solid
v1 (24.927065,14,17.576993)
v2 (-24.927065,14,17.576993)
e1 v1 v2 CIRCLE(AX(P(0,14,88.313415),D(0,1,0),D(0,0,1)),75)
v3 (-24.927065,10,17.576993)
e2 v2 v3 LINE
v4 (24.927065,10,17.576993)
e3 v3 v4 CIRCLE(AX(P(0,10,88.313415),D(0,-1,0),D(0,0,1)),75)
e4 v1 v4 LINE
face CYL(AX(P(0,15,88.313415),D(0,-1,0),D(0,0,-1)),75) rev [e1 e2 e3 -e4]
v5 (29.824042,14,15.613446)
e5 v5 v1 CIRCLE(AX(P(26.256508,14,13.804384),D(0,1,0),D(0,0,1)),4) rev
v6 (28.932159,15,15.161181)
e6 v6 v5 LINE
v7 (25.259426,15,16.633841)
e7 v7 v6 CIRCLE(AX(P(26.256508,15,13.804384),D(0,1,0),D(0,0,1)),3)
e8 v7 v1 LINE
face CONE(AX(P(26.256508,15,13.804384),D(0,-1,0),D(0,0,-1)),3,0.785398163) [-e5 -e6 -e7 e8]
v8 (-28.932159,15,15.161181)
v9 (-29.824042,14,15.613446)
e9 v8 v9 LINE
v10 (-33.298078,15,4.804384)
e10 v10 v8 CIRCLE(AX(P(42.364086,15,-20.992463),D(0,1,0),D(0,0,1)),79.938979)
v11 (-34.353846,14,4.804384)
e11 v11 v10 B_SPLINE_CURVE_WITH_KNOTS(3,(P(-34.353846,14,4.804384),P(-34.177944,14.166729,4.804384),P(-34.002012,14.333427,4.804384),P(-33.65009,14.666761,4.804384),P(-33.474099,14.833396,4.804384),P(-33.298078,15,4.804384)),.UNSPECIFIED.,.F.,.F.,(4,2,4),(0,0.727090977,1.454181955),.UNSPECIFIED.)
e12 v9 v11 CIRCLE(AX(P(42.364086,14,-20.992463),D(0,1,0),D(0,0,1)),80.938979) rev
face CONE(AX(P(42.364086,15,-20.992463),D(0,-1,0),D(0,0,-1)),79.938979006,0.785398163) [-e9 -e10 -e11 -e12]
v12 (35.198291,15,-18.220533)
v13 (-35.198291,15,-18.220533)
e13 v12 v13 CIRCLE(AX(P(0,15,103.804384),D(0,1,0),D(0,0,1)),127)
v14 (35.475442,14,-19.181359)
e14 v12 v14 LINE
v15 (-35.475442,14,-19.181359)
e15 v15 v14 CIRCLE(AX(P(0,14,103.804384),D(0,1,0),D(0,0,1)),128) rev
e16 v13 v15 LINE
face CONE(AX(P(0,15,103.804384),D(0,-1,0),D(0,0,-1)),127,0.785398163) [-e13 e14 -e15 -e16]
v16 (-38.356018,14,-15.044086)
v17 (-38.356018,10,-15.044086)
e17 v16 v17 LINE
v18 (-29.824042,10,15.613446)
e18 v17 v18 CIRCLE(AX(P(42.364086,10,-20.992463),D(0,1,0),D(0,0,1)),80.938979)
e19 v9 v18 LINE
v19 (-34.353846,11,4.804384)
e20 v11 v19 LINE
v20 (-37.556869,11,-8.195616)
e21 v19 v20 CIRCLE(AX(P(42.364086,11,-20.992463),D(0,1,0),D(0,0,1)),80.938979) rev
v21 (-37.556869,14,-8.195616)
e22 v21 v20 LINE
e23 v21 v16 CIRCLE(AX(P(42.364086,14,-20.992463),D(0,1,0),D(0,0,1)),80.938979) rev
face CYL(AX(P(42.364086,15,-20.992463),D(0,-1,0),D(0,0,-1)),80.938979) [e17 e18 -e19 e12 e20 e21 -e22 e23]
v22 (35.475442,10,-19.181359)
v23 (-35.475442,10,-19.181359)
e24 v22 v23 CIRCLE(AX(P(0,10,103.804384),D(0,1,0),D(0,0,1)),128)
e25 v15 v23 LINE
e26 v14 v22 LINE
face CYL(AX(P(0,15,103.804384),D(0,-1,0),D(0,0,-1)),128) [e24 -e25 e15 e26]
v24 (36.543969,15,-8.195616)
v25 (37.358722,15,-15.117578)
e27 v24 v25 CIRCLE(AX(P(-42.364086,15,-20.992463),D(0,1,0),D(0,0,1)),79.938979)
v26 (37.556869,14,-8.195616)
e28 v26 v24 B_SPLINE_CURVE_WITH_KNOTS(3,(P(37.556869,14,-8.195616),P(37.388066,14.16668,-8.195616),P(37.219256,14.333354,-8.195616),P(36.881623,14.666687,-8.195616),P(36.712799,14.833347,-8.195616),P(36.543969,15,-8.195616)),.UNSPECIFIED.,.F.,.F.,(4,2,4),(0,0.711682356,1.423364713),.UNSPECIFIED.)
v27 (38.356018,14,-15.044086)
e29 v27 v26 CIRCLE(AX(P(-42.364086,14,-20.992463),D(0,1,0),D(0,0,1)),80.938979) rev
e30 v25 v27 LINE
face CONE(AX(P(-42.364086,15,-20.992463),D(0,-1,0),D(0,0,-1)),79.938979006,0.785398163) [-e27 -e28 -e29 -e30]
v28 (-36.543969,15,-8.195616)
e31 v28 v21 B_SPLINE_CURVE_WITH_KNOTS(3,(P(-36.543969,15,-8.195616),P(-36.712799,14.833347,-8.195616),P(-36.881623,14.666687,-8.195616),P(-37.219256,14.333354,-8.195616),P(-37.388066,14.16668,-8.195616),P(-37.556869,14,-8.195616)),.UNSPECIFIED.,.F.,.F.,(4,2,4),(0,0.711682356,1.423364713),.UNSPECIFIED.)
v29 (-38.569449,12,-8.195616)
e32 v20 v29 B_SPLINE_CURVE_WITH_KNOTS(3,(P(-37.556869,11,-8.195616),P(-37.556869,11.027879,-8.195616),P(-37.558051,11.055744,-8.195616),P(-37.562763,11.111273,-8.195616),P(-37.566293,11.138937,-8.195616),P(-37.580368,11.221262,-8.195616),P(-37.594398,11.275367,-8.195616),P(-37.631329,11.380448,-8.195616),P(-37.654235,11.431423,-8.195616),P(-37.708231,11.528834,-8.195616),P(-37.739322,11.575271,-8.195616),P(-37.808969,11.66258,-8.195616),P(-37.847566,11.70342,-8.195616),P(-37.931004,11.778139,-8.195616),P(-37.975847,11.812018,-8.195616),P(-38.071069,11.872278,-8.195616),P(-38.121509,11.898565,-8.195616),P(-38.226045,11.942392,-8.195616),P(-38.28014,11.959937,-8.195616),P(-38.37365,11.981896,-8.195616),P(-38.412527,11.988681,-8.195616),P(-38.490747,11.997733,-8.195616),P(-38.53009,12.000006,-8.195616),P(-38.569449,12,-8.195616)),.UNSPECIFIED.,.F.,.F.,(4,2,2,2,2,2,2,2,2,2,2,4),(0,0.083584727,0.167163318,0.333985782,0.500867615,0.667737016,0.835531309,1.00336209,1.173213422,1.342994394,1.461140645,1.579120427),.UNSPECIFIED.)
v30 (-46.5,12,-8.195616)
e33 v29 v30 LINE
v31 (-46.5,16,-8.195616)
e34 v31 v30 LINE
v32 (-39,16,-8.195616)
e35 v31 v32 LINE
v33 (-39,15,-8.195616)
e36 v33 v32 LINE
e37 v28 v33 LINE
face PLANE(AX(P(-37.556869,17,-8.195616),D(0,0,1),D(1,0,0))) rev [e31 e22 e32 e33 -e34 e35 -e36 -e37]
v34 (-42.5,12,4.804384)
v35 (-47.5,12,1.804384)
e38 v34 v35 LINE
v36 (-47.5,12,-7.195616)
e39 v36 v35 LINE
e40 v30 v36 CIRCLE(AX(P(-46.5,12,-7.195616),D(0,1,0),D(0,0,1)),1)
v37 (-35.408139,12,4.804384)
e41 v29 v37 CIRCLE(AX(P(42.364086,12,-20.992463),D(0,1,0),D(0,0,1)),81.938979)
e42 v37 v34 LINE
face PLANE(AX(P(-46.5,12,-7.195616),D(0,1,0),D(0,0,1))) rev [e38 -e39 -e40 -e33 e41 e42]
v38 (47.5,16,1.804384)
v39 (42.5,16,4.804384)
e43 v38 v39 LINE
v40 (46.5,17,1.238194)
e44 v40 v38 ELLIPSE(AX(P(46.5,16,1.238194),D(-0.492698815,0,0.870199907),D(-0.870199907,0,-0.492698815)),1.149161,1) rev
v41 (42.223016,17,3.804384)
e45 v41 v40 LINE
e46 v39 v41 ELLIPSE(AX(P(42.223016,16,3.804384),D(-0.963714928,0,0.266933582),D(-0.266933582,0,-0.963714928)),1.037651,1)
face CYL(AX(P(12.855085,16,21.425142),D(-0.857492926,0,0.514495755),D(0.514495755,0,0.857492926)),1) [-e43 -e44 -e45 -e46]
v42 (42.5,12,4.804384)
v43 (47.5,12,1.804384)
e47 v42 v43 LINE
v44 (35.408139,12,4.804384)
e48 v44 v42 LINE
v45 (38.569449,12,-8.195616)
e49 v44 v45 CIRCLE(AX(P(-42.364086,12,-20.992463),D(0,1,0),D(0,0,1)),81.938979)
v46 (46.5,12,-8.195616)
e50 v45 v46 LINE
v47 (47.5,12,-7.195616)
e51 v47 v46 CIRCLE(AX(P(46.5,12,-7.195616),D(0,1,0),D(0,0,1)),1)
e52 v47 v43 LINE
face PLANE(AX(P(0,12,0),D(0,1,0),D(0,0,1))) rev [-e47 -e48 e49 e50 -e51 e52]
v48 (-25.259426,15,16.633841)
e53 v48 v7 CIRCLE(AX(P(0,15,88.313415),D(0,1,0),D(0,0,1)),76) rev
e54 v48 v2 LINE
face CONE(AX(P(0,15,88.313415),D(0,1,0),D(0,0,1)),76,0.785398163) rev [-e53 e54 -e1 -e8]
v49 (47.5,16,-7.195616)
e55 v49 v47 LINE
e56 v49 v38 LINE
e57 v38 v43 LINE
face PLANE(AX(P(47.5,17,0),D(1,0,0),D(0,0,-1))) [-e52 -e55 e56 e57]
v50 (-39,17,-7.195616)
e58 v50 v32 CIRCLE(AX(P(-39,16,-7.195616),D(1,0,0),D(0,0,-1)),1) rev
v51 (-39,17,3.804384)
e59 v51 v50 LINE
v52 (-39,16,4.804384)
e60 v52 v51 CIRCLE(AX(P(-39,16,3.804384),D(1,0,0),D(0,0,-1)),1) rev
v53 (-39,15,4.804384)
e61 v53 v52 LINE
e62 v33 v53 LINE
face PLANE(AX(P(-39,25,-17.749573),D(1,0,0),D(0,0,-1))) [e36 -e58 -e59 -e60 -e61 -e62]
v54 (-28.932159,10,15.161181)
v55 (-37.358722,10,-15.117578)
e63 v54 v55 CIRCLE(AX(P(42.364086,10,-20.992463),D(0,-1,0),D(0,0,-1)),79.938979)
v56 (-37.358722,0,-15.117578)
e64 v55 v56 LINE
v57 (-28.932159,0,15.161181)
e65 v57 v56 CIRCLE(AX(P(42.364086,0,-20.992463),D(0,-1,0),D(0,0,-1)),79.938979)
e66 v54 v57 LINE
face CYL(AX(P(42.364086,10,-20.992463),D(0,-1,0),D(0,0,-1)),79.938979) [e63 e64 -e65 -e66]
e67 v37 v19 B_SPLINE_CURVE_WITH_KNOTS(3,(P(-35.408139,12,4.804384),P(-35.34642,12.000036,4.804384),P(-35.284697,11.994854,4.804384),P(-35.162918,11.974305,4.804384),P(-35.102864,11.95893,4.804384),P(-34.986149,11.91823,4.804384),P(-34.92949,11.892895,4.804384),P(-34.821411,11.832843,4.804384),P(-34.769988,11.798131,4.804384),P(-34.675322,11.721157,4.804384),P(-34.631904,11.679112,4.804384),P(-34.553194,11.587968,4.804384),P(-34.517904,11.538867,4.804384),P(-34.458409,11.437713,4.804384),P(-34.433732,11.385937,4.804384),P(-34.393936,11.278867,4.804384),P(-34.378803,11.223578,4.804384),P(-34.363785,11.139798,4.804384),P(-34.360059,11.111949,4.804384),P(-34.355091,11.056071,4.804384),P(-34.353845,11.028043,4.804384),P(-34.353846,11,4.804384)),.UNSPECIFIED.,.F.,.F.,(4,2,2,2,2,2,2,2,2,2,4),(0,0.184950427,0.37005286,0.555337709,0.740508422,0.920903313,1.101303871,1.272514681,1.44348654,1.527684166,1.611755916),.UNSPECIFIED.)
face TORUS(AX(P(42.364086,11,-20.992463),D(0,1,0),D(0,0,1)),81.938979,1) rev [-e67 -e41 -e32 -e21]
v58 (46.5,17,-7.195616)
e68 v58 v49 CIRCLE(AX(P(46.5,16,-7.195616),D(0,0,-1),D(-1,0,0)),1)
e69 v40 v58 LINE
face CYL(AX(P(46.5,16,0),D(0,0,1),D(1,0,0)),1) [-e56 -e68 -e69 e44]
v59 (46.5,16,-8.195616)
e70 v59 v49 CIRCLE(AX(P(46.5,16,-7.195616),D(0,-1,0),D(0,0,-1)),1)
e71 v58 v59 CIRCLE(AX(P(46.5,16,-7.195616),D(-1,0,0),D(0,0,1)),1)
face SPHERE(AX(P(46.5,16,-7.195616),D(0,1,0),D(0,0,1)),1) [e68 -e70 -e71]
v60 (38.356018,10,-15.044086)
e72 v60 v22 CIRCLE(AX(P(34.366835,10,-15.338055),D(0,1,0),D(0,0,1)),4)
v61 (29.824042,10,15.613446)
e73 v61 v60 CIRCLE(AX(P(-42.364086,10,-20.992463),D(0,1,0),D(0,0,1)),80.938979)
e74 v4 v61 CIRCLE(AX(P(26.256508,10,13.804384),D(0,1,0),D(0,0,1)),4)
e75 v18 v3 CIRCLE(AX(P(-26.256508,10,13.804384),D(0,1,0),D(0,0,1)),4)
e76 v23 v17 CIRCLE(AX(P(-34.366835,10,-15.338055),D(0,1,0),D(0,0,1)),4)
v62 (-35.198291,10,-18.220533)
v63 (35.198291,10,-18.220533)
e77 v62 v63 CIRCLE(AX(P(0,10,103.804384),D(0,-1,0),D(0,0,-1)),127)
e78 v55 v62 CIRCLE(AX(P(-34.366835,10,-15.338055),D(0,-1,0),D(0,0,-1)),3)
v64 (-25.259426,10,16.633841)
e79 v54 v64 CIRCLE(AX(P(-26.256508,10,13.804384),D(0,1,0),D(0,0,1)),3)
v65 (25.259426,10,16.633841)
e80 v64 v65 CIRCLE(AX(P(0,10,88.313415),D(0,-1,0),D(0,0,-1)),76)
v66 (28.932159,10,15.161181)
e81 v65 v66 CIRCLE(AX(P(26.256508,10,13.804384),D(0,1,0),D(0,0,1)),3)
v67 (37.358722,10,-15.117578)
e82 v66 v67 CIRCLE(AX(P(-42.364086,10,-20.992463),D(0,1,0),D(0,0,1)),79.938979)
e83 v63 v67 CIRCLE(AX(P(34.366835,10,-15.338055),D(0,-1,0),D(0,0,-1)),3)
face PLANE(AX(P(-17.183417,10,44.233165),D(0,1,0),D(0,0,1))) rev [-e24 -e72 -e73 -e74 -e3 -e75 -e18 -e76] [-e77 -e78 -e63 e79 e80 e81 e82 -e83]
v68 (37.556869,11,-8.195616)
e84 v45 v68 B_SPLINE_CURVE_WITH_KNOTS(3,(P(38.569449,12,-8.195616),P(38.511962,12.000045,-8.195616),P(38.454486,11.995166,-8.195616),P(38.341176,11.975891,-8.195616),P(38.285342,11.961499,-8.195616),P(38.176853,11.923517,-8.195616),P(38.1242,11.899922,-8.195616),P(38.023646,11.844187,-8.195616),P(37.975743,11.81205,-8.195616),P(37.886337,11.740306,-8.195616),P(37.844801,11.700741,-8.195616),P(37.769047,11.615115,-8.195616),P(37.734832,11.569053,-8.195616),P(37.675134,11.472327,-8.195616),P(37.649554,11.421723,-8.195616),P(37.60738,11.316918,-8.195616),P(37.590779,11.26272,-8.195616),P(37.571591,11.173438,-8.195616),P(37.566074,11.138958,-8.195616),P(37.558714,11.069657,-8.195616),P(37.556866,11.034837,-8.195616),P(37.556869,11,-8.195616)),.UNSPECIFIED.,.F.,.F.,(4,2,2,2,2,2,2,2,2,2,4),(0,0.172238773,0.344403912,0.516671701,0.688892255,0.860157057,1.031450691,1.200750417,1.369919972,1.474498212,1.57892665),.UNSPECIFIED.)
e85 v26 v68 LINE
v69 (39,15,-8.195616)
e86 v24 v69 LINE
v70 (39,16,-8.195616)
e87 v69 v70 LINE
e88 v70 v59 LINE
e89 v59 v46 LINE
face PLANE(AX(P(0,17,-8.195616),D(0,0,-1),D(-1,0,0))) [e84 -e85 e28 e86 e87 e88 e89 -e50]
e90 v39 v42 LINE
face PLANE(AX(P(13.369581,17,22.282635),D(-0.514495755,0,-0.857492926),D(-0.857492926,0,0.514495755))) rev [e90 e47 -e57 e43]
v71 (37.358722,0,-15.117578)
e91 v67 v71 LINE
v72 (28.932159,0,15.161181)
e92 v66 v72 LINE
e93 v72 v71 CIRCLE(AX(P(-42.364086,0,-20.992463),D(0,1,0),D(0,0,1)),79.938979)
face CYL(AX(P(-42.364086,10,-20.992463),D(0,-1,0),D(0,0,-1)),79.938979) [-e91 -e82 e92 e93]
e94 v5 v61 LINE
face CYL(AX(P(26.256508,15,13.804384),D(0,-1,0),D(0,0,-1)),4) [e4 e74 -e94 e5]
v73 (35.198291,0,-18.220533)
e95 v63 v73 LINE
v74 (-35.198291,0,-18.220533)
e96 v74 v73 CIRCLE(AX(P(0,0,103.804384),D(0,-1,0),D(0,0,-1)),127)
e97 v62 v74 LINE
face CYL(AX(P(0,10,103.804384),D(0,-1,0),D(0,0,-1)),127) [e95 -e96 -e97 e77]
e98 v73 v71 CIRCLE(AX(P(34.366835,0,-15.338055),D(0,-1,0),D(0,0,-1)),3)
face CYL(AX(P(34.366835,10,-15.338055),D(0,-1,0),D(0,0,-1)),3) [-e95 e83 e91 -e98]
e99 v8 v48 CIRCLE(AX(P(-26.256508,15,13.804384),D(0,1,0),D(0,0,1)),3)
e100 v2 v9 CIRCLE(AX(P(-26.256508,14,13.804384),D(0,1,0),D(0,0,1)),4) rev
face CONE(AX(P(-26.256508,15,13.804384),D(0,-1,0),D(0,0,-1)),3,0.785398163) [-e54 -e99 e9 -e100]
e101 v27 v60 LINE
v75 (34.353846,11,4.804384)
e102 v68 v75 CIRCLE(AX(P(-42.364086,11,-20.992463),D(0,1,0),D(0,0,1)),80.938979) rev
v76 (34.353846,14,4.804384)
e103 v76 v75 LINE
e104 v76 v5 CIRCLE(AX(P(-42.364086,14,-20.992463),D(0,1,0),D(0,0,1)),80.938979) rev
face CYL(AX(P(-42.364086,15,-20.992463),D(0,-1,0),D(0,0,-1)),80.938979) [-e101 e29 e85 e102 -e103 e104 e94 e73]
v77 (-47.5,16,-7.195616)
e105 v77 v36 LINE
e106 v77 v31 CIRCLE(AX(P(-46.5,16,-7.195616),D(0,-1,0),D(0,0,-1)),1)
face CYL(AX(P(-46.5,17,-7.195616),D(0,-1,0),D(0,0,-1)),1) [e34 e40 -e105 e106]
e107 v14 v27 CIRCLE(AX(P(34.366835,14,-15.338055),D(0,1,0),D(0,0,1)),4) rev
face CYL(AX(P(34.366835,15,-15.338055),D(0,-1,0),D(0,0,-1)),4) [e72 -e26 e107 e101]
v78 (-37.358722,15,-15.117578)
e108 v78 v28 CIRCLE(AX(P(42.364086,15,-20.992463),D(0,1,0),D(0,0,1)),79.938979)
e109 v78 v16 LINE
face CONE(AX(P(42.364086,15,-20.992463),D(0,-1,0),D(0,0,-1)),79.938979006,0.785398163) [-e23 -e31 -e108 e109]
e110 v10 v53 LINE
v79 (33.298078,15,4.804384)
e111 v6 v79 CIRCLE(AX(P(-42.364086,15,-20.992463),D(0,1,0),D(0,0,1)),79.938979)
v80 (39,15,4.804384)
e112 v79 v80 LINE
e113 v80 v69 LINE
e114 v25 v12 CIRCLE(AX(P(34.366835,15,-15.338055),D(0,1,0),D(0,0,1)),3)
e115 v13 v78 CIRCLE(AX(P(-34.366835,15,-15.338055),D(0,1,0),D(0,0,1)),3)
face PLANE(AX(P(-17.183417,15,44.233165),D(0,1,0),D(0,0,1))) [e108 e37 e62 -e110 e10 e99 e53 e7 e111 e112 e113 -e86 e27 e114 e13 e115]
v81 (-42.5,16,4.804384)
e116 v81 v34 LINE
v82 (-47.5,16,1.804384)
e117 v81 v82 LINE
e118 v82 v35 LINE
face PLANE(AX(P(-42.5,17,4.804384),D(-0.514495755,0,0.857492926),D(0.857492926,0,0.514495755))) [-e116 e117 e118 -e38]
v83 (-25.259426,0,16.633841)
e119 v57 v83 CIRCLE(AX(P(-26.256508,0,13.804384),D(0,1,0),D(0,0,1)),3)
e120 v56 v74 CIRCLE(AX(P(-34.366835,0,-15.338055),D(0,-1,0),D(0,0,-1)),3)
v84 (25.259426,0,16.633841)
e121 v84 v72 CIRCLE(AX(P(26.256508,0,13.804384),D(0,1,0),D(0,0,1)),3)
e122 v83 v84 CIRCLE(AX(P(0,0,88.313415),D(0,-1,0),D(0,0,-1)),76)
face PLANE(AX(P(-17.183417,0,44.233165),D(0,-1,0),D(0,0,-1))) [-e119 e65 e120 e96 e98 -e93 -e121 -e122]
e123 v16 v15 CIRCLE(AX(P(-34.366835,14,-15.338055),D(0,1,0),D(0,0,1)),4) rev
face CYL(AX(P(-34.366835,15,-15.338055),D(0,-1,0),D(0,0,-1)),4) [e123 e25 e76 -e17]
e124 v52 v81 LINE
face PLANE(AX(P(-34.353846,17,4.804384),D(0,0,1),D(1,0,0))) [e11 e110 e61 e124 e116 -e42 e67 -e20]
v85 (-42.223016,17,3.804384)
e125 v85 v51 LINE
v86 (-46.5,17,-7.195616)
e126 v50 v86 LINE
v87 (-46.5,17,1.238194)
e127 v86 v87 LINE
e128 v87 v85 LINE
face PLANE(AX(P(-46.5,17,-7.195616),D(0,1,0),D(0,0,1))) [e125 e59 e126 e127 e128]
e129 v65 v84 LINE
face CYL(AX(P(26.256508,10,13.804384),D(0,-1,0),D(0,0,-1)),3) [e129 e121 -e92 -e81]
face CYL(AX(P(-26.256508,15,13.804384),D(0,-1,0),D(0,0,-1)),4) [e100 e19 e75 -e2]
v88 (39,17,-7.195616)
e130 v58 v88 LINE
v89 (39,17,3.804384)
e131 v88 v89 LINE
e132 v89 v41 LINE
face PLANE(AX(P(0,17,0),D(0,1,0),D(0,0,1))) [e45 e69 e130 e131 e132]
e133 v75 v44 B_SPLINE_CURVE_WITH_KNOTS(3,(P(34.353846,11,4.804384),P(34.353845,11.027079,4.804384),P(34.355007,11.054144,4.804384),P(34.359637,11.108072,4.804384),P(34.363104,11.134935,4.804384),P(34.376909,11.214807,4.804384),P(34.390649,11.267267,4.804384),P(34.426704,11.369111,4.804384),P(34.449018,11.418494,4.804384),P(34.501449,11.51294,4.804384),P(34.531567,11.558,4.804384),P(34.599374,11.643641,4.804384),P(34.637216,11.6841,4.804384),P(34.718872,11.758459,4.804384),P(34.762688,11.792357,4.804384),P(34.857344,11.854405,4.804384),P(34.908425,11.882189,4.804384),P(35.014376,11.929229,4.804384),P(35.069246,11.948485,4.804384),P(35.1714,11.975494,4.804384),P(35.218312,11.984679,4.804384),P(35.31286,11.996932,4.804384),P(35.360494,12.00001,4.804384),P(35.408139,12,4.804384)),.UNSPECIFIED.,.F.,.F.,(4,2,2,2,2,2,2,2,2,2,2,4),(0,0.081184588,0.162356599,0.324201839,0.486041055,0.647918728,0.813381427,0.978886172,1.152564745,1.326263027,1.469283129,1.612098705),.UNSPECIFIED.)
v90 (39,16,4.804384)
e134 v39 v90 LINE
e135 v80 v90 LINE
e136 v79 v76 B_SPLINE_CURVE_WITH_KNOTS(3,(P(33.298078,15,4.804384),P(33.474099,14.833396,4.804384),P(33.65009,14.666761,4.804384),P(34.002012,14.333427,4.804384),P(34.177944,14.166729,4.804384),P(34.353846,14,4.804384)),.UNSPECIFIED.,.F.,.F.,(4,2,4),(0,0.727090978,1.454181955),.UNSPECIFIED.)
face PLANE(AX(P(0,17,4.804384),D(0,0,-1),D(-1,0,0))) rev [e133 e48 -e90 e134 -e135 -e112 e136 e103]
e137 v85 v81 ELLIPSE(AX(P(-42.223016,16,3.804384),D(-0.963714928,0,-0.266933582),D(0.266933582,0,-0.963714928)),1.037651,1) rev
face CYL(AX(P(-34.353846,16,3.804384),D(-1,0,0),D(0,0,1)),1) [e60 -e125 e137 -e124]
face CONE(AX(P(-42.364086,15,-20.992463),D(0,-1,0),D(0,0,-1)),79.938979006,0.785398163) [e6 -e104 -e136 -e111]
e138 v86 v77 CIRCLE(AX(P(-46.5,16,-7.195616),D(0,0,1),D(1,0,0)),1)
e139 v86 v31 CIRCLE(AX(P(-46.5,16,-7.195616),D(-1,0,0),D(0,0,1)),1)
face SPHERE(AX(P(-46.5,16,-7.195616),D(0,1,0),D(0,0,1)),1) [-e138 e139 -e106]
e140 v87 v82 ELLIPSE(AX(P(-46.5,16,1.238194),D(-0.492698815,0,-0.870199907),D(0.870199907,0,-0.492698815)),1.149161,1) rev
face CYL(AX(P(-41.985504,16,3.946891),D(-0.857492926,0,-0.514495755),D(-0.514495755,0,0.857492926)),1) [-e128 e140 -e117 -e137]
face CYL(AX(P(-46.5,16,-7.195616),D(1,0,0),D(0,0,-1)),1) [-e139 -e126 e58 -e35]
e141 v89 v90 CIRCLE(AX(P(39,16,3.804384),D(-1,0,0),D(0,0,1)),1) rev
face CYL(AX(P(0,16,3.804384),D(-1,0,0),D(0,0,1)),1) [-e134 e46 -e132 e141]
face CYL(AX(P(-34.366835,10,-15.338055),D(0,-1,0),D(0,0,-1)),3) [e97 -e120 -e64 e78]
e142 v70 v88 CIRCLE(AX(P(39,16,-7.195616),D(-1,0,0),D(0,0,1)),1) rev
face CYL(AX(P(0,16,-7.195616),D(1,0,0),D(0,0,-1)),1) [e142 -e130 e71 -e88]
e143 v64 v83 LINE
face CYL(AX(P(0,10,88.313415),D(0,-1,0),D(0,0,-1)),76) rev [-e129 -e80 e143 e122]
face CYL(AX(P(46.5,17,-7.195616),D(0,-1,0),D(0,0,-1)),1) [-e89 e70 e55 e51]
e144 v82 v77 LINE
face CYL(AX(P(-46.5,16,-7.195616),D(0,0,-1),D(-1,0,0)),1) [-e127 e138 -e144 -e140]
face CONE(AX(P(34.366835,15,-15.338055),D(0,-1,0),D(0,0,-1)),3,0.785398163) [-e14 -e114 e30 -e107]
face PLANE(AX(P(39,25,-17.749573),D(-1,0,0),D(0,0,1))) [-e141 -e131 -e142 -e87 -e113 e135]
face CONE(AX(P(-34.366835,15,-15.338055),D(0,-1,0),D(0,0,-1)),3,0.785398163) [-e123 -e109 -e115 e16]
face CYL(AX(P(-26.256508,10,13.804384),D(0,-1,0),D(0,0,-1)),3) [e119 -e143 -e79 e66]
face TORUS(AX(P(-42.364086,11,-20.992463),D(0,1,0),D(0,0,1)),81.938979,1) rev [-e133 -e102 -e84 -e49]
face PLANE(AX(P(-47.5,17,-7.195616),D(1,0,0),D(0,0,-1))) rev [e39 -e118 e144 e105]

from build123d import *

# Parameters (mm, degrees)
DODANIE_WYCI_GNI_CIE2_DEPTH      = 10
DODANIE_WYCI_GNI_CIE3_DEPTH      = 5
DODANIE_WYCI_GNI_CIE4_DEPTH      = 2
DODANIE_WYCI_GNI_CIE4_DEPTH_BACK = 3
SFAZOWANIE2_SIZE                 = 1
ZAOKR_GLENIE2_R                  = 1
SZKIC5_W                         = 78
SZKIC5_H                         = 47.399243566
WYTNIJ_WYCI_GNI_CIE1_DEPTH       = 10


with BuildPart() as part:
    # Szkic1 → Dodanie-wyciągnięcie2 (new body)
    with BuildSketch(Plane(origin=(0, 0, 0), x_dir=(1, 0, 0), z_dir=(0, 1, 0))):
        with BuildLine():
            ThreePointArc((-35.198290521, 18.220532858), (0, 23.195615958), (35.198290521, 18.220532858))
            ThreePointArc((35.198290521, 18.220532858), (36.828860435, 17.052239434), (37.358722234, 15.117578161))
            ThreePointArc((37.358722234, 15.117578161), (34.64818175, -0.440013395), (28.93215854, -15.161180582))
            ThreePointArc((28.93215854, -15.161180582), (27.37301165, -16.588880533), (25.259425897, -16.633840931))
            ThreePointArc((25.259425897, -16.633840931), (0, -12.31341545), (-25.259425897, -16.633840931))
            ThreePointArc((-25.259425897, -16.633840931), (-27.37301165, -16.588880533), (-28.93215854, -15.161180582))
            ThreePointArc((-28.93215854, -15.161180582), (-34.64818175, -0.440013395), (-37.358722234, 15.117578161))
            ThreePointArc((-37.358722234, 15.117578161), (-36.828860435, 17.052239434), (-35.198290521, 18.220532858))
        make_face()
    extrude(amount=DODANIE_WYCI_GNI_CIE2_DEPTH)

    # Szkic3 → Dodanie-wyciągnięcie3 (add)
    with BuildSketch(Plane(origin=(0, 10, 0), x_dir=(1, 0, 0), z_dir=(0, 1, 0))):
        with BuildLine():
            ThreePointArc((-35.475442415, 19.181358975), (-37.649535634, 17.62363441), (-38.356018032, 15.044086045))
            ThreePointArc((-38.356018032, 15.044086045), (-35.611569929, -0.708123852), (-29.824041887, -15.613446096))
            ThreePointArc((-29.824041887, -15.613446096), (-27.745179368, -17.51704603), (-24.92706503, -17.576993227))
            ThreePointArc((-24.92706503, -17.576993227), (0, -13.31341545), (24.92706503, -17.576993227))
            ThreePointArc((24.92706503, -17.576993227), (27.745179368, -17.51704603), (29.824041887, -15.613446096))
            ThreePointArc((29.824041887, -15.613446096), (35.611569929, -0.708123852), (38.356018032, 15.044086045))
            ThreePointArc((38.356018032, 15.044086045), (37.649535634, 17.62363441), (35.475442415, 19.181358975))
            ThreePointArc((35.475442415, 19.181358975), (0, 24.195615958), (-35.475442415, 19.181358975))
        make_face()
    extrude(amount=DODANIE_WYCI_GNI_CIE3_DEPTH)

    # Szkic4 → Dodanie-wyciągnięcie4 (add, two sides: drawn at the far end of the back side and taken through both)
    with BuildSketch(Plane(origin=(0, 15, 0), x_dir=(1, 0, 0), z_dir=(0, 1, 0)).offset(-DODANIE_WYCI_GNI_CIE4_DEPTH_BACK)):
        with BuildLine():
            Line((-34.353845871, -4.804384042), (-38.327790803, -4.804384042))
            Line((-38.327790803, -4.804384042), (-42.5, -4.804384042))
            Line((-42.5, -4.804384042), (-47.5, -1.804384042))
            Line((-47.5, -1.804384042), (-47.5, 7.195615958))
            ThreePointArc((-47.5, 7.195615958), (-47.207106781, 7.90272274), (-46.5, 8.195615958))
            Line((-46.5, 8.195615958), (-37.556869269, 8.195615958))
            ThreePointArc((-37.556869269, 8.195615958), (-36.224623376, 1.629272522), (-34.353845871, -4.804384042))
        make_face()
        with BuildLine():
            Line((42.5, -4.804384042), (47.5, -1.804384042))
            Line((47.5, -1.804384042), (47.5, 7.195615958))
            ThreePointArc((47.5, 7.195615958), (47.207106781, 7.90272274), (46.5, 8.195615958))
            Line((46.5, 8.195615958), (37.556869269, 8.195615958))
            ThreePointArc((37.556869269, 8.195615958), (36.224623376, 1.629272522), (34.353845871, -4.804384042))
            Line((34.353845871, -4.804384042), (38.327790803, -4.804384042))
            Line((38.327790803, -4.804384042), (42.5, -4.804384042))
        make_face()
    extrude(amount=DODANIE_WYCI_GNI_CIE4_DEPTH + DODANIE_WYCI_GNI_CIE4_DEPTH_BACK)

    # Sfazowanie2
    sfazowanie2_edges = [part.edges().sort_by_distance(p)[0] for p in [
        (0, 15, -24.195615958),
        (-37.649535634, 15, -17.62363441),
        (-38.029401728, 15, -11.611337515),
        (-27.745179368, 15, 17.51704603),
        (0, 15, 13.31341545),
        (27.745179368, 15, 17.51704603),
        (32.284843088, 15, 10.291011463),
        (37.649535634, 15, -17.62363441),
        (38.029401728, 15, -11.611337515),
        (-32.284843088, 15, 10.291011463),
    ]]
    chamfer(sfazowanie2_edges, length=SFAZOWANIE2_SIZE)

    # Zaokrąglenie2
    zaokr_glenie2_edges = [part.edges().sort_by_distance(p)[0] for p in [
        (-36.224623376, 12, -1.629272522),
        (-36.224623376, 15, -1.629272522),
        (-38.426922936, 17, 4.804384042),
        (-45, 17, 3.304384042),
        (-47.5, 17, -2.695615958),
        (-42.028434635, 17, -8.195615958),
        (42.028434635, 17, -8.195615958),
        (47.5, 17, -2.695615958),
        (45, 17, 3.304384042),
        (38.426922936, 17, 4.804384042),
        (36.224623376, 12, -1.629272522),
        (36.224623376, 15, -1.629272522),
        (36.224623376, 17, -1.629272522),
    ]]
    fillet(zaokr_glenie2_edges, radius=ZAOKR_GLENIE2_R - 0.0001)  # a hair under: the kernel refuses the full size

    # Szkic5 → Wytnij-wyciągnięcie1 (cut)
    with BuildSketch(Plane(origin=(0, 15, 0), x_dir=(1, 0, 0), z_dir=(0, 1, 0))):
        with Locations((0, -5.950048289)):
            Rectangle(SZKIC5_W, SZKIC5_H)
    extrude(amount=WYTNIJ_WYCI_GNI_CIE1_DEPTH, mode=Mode.SUBTRACT)


solid = part.part
